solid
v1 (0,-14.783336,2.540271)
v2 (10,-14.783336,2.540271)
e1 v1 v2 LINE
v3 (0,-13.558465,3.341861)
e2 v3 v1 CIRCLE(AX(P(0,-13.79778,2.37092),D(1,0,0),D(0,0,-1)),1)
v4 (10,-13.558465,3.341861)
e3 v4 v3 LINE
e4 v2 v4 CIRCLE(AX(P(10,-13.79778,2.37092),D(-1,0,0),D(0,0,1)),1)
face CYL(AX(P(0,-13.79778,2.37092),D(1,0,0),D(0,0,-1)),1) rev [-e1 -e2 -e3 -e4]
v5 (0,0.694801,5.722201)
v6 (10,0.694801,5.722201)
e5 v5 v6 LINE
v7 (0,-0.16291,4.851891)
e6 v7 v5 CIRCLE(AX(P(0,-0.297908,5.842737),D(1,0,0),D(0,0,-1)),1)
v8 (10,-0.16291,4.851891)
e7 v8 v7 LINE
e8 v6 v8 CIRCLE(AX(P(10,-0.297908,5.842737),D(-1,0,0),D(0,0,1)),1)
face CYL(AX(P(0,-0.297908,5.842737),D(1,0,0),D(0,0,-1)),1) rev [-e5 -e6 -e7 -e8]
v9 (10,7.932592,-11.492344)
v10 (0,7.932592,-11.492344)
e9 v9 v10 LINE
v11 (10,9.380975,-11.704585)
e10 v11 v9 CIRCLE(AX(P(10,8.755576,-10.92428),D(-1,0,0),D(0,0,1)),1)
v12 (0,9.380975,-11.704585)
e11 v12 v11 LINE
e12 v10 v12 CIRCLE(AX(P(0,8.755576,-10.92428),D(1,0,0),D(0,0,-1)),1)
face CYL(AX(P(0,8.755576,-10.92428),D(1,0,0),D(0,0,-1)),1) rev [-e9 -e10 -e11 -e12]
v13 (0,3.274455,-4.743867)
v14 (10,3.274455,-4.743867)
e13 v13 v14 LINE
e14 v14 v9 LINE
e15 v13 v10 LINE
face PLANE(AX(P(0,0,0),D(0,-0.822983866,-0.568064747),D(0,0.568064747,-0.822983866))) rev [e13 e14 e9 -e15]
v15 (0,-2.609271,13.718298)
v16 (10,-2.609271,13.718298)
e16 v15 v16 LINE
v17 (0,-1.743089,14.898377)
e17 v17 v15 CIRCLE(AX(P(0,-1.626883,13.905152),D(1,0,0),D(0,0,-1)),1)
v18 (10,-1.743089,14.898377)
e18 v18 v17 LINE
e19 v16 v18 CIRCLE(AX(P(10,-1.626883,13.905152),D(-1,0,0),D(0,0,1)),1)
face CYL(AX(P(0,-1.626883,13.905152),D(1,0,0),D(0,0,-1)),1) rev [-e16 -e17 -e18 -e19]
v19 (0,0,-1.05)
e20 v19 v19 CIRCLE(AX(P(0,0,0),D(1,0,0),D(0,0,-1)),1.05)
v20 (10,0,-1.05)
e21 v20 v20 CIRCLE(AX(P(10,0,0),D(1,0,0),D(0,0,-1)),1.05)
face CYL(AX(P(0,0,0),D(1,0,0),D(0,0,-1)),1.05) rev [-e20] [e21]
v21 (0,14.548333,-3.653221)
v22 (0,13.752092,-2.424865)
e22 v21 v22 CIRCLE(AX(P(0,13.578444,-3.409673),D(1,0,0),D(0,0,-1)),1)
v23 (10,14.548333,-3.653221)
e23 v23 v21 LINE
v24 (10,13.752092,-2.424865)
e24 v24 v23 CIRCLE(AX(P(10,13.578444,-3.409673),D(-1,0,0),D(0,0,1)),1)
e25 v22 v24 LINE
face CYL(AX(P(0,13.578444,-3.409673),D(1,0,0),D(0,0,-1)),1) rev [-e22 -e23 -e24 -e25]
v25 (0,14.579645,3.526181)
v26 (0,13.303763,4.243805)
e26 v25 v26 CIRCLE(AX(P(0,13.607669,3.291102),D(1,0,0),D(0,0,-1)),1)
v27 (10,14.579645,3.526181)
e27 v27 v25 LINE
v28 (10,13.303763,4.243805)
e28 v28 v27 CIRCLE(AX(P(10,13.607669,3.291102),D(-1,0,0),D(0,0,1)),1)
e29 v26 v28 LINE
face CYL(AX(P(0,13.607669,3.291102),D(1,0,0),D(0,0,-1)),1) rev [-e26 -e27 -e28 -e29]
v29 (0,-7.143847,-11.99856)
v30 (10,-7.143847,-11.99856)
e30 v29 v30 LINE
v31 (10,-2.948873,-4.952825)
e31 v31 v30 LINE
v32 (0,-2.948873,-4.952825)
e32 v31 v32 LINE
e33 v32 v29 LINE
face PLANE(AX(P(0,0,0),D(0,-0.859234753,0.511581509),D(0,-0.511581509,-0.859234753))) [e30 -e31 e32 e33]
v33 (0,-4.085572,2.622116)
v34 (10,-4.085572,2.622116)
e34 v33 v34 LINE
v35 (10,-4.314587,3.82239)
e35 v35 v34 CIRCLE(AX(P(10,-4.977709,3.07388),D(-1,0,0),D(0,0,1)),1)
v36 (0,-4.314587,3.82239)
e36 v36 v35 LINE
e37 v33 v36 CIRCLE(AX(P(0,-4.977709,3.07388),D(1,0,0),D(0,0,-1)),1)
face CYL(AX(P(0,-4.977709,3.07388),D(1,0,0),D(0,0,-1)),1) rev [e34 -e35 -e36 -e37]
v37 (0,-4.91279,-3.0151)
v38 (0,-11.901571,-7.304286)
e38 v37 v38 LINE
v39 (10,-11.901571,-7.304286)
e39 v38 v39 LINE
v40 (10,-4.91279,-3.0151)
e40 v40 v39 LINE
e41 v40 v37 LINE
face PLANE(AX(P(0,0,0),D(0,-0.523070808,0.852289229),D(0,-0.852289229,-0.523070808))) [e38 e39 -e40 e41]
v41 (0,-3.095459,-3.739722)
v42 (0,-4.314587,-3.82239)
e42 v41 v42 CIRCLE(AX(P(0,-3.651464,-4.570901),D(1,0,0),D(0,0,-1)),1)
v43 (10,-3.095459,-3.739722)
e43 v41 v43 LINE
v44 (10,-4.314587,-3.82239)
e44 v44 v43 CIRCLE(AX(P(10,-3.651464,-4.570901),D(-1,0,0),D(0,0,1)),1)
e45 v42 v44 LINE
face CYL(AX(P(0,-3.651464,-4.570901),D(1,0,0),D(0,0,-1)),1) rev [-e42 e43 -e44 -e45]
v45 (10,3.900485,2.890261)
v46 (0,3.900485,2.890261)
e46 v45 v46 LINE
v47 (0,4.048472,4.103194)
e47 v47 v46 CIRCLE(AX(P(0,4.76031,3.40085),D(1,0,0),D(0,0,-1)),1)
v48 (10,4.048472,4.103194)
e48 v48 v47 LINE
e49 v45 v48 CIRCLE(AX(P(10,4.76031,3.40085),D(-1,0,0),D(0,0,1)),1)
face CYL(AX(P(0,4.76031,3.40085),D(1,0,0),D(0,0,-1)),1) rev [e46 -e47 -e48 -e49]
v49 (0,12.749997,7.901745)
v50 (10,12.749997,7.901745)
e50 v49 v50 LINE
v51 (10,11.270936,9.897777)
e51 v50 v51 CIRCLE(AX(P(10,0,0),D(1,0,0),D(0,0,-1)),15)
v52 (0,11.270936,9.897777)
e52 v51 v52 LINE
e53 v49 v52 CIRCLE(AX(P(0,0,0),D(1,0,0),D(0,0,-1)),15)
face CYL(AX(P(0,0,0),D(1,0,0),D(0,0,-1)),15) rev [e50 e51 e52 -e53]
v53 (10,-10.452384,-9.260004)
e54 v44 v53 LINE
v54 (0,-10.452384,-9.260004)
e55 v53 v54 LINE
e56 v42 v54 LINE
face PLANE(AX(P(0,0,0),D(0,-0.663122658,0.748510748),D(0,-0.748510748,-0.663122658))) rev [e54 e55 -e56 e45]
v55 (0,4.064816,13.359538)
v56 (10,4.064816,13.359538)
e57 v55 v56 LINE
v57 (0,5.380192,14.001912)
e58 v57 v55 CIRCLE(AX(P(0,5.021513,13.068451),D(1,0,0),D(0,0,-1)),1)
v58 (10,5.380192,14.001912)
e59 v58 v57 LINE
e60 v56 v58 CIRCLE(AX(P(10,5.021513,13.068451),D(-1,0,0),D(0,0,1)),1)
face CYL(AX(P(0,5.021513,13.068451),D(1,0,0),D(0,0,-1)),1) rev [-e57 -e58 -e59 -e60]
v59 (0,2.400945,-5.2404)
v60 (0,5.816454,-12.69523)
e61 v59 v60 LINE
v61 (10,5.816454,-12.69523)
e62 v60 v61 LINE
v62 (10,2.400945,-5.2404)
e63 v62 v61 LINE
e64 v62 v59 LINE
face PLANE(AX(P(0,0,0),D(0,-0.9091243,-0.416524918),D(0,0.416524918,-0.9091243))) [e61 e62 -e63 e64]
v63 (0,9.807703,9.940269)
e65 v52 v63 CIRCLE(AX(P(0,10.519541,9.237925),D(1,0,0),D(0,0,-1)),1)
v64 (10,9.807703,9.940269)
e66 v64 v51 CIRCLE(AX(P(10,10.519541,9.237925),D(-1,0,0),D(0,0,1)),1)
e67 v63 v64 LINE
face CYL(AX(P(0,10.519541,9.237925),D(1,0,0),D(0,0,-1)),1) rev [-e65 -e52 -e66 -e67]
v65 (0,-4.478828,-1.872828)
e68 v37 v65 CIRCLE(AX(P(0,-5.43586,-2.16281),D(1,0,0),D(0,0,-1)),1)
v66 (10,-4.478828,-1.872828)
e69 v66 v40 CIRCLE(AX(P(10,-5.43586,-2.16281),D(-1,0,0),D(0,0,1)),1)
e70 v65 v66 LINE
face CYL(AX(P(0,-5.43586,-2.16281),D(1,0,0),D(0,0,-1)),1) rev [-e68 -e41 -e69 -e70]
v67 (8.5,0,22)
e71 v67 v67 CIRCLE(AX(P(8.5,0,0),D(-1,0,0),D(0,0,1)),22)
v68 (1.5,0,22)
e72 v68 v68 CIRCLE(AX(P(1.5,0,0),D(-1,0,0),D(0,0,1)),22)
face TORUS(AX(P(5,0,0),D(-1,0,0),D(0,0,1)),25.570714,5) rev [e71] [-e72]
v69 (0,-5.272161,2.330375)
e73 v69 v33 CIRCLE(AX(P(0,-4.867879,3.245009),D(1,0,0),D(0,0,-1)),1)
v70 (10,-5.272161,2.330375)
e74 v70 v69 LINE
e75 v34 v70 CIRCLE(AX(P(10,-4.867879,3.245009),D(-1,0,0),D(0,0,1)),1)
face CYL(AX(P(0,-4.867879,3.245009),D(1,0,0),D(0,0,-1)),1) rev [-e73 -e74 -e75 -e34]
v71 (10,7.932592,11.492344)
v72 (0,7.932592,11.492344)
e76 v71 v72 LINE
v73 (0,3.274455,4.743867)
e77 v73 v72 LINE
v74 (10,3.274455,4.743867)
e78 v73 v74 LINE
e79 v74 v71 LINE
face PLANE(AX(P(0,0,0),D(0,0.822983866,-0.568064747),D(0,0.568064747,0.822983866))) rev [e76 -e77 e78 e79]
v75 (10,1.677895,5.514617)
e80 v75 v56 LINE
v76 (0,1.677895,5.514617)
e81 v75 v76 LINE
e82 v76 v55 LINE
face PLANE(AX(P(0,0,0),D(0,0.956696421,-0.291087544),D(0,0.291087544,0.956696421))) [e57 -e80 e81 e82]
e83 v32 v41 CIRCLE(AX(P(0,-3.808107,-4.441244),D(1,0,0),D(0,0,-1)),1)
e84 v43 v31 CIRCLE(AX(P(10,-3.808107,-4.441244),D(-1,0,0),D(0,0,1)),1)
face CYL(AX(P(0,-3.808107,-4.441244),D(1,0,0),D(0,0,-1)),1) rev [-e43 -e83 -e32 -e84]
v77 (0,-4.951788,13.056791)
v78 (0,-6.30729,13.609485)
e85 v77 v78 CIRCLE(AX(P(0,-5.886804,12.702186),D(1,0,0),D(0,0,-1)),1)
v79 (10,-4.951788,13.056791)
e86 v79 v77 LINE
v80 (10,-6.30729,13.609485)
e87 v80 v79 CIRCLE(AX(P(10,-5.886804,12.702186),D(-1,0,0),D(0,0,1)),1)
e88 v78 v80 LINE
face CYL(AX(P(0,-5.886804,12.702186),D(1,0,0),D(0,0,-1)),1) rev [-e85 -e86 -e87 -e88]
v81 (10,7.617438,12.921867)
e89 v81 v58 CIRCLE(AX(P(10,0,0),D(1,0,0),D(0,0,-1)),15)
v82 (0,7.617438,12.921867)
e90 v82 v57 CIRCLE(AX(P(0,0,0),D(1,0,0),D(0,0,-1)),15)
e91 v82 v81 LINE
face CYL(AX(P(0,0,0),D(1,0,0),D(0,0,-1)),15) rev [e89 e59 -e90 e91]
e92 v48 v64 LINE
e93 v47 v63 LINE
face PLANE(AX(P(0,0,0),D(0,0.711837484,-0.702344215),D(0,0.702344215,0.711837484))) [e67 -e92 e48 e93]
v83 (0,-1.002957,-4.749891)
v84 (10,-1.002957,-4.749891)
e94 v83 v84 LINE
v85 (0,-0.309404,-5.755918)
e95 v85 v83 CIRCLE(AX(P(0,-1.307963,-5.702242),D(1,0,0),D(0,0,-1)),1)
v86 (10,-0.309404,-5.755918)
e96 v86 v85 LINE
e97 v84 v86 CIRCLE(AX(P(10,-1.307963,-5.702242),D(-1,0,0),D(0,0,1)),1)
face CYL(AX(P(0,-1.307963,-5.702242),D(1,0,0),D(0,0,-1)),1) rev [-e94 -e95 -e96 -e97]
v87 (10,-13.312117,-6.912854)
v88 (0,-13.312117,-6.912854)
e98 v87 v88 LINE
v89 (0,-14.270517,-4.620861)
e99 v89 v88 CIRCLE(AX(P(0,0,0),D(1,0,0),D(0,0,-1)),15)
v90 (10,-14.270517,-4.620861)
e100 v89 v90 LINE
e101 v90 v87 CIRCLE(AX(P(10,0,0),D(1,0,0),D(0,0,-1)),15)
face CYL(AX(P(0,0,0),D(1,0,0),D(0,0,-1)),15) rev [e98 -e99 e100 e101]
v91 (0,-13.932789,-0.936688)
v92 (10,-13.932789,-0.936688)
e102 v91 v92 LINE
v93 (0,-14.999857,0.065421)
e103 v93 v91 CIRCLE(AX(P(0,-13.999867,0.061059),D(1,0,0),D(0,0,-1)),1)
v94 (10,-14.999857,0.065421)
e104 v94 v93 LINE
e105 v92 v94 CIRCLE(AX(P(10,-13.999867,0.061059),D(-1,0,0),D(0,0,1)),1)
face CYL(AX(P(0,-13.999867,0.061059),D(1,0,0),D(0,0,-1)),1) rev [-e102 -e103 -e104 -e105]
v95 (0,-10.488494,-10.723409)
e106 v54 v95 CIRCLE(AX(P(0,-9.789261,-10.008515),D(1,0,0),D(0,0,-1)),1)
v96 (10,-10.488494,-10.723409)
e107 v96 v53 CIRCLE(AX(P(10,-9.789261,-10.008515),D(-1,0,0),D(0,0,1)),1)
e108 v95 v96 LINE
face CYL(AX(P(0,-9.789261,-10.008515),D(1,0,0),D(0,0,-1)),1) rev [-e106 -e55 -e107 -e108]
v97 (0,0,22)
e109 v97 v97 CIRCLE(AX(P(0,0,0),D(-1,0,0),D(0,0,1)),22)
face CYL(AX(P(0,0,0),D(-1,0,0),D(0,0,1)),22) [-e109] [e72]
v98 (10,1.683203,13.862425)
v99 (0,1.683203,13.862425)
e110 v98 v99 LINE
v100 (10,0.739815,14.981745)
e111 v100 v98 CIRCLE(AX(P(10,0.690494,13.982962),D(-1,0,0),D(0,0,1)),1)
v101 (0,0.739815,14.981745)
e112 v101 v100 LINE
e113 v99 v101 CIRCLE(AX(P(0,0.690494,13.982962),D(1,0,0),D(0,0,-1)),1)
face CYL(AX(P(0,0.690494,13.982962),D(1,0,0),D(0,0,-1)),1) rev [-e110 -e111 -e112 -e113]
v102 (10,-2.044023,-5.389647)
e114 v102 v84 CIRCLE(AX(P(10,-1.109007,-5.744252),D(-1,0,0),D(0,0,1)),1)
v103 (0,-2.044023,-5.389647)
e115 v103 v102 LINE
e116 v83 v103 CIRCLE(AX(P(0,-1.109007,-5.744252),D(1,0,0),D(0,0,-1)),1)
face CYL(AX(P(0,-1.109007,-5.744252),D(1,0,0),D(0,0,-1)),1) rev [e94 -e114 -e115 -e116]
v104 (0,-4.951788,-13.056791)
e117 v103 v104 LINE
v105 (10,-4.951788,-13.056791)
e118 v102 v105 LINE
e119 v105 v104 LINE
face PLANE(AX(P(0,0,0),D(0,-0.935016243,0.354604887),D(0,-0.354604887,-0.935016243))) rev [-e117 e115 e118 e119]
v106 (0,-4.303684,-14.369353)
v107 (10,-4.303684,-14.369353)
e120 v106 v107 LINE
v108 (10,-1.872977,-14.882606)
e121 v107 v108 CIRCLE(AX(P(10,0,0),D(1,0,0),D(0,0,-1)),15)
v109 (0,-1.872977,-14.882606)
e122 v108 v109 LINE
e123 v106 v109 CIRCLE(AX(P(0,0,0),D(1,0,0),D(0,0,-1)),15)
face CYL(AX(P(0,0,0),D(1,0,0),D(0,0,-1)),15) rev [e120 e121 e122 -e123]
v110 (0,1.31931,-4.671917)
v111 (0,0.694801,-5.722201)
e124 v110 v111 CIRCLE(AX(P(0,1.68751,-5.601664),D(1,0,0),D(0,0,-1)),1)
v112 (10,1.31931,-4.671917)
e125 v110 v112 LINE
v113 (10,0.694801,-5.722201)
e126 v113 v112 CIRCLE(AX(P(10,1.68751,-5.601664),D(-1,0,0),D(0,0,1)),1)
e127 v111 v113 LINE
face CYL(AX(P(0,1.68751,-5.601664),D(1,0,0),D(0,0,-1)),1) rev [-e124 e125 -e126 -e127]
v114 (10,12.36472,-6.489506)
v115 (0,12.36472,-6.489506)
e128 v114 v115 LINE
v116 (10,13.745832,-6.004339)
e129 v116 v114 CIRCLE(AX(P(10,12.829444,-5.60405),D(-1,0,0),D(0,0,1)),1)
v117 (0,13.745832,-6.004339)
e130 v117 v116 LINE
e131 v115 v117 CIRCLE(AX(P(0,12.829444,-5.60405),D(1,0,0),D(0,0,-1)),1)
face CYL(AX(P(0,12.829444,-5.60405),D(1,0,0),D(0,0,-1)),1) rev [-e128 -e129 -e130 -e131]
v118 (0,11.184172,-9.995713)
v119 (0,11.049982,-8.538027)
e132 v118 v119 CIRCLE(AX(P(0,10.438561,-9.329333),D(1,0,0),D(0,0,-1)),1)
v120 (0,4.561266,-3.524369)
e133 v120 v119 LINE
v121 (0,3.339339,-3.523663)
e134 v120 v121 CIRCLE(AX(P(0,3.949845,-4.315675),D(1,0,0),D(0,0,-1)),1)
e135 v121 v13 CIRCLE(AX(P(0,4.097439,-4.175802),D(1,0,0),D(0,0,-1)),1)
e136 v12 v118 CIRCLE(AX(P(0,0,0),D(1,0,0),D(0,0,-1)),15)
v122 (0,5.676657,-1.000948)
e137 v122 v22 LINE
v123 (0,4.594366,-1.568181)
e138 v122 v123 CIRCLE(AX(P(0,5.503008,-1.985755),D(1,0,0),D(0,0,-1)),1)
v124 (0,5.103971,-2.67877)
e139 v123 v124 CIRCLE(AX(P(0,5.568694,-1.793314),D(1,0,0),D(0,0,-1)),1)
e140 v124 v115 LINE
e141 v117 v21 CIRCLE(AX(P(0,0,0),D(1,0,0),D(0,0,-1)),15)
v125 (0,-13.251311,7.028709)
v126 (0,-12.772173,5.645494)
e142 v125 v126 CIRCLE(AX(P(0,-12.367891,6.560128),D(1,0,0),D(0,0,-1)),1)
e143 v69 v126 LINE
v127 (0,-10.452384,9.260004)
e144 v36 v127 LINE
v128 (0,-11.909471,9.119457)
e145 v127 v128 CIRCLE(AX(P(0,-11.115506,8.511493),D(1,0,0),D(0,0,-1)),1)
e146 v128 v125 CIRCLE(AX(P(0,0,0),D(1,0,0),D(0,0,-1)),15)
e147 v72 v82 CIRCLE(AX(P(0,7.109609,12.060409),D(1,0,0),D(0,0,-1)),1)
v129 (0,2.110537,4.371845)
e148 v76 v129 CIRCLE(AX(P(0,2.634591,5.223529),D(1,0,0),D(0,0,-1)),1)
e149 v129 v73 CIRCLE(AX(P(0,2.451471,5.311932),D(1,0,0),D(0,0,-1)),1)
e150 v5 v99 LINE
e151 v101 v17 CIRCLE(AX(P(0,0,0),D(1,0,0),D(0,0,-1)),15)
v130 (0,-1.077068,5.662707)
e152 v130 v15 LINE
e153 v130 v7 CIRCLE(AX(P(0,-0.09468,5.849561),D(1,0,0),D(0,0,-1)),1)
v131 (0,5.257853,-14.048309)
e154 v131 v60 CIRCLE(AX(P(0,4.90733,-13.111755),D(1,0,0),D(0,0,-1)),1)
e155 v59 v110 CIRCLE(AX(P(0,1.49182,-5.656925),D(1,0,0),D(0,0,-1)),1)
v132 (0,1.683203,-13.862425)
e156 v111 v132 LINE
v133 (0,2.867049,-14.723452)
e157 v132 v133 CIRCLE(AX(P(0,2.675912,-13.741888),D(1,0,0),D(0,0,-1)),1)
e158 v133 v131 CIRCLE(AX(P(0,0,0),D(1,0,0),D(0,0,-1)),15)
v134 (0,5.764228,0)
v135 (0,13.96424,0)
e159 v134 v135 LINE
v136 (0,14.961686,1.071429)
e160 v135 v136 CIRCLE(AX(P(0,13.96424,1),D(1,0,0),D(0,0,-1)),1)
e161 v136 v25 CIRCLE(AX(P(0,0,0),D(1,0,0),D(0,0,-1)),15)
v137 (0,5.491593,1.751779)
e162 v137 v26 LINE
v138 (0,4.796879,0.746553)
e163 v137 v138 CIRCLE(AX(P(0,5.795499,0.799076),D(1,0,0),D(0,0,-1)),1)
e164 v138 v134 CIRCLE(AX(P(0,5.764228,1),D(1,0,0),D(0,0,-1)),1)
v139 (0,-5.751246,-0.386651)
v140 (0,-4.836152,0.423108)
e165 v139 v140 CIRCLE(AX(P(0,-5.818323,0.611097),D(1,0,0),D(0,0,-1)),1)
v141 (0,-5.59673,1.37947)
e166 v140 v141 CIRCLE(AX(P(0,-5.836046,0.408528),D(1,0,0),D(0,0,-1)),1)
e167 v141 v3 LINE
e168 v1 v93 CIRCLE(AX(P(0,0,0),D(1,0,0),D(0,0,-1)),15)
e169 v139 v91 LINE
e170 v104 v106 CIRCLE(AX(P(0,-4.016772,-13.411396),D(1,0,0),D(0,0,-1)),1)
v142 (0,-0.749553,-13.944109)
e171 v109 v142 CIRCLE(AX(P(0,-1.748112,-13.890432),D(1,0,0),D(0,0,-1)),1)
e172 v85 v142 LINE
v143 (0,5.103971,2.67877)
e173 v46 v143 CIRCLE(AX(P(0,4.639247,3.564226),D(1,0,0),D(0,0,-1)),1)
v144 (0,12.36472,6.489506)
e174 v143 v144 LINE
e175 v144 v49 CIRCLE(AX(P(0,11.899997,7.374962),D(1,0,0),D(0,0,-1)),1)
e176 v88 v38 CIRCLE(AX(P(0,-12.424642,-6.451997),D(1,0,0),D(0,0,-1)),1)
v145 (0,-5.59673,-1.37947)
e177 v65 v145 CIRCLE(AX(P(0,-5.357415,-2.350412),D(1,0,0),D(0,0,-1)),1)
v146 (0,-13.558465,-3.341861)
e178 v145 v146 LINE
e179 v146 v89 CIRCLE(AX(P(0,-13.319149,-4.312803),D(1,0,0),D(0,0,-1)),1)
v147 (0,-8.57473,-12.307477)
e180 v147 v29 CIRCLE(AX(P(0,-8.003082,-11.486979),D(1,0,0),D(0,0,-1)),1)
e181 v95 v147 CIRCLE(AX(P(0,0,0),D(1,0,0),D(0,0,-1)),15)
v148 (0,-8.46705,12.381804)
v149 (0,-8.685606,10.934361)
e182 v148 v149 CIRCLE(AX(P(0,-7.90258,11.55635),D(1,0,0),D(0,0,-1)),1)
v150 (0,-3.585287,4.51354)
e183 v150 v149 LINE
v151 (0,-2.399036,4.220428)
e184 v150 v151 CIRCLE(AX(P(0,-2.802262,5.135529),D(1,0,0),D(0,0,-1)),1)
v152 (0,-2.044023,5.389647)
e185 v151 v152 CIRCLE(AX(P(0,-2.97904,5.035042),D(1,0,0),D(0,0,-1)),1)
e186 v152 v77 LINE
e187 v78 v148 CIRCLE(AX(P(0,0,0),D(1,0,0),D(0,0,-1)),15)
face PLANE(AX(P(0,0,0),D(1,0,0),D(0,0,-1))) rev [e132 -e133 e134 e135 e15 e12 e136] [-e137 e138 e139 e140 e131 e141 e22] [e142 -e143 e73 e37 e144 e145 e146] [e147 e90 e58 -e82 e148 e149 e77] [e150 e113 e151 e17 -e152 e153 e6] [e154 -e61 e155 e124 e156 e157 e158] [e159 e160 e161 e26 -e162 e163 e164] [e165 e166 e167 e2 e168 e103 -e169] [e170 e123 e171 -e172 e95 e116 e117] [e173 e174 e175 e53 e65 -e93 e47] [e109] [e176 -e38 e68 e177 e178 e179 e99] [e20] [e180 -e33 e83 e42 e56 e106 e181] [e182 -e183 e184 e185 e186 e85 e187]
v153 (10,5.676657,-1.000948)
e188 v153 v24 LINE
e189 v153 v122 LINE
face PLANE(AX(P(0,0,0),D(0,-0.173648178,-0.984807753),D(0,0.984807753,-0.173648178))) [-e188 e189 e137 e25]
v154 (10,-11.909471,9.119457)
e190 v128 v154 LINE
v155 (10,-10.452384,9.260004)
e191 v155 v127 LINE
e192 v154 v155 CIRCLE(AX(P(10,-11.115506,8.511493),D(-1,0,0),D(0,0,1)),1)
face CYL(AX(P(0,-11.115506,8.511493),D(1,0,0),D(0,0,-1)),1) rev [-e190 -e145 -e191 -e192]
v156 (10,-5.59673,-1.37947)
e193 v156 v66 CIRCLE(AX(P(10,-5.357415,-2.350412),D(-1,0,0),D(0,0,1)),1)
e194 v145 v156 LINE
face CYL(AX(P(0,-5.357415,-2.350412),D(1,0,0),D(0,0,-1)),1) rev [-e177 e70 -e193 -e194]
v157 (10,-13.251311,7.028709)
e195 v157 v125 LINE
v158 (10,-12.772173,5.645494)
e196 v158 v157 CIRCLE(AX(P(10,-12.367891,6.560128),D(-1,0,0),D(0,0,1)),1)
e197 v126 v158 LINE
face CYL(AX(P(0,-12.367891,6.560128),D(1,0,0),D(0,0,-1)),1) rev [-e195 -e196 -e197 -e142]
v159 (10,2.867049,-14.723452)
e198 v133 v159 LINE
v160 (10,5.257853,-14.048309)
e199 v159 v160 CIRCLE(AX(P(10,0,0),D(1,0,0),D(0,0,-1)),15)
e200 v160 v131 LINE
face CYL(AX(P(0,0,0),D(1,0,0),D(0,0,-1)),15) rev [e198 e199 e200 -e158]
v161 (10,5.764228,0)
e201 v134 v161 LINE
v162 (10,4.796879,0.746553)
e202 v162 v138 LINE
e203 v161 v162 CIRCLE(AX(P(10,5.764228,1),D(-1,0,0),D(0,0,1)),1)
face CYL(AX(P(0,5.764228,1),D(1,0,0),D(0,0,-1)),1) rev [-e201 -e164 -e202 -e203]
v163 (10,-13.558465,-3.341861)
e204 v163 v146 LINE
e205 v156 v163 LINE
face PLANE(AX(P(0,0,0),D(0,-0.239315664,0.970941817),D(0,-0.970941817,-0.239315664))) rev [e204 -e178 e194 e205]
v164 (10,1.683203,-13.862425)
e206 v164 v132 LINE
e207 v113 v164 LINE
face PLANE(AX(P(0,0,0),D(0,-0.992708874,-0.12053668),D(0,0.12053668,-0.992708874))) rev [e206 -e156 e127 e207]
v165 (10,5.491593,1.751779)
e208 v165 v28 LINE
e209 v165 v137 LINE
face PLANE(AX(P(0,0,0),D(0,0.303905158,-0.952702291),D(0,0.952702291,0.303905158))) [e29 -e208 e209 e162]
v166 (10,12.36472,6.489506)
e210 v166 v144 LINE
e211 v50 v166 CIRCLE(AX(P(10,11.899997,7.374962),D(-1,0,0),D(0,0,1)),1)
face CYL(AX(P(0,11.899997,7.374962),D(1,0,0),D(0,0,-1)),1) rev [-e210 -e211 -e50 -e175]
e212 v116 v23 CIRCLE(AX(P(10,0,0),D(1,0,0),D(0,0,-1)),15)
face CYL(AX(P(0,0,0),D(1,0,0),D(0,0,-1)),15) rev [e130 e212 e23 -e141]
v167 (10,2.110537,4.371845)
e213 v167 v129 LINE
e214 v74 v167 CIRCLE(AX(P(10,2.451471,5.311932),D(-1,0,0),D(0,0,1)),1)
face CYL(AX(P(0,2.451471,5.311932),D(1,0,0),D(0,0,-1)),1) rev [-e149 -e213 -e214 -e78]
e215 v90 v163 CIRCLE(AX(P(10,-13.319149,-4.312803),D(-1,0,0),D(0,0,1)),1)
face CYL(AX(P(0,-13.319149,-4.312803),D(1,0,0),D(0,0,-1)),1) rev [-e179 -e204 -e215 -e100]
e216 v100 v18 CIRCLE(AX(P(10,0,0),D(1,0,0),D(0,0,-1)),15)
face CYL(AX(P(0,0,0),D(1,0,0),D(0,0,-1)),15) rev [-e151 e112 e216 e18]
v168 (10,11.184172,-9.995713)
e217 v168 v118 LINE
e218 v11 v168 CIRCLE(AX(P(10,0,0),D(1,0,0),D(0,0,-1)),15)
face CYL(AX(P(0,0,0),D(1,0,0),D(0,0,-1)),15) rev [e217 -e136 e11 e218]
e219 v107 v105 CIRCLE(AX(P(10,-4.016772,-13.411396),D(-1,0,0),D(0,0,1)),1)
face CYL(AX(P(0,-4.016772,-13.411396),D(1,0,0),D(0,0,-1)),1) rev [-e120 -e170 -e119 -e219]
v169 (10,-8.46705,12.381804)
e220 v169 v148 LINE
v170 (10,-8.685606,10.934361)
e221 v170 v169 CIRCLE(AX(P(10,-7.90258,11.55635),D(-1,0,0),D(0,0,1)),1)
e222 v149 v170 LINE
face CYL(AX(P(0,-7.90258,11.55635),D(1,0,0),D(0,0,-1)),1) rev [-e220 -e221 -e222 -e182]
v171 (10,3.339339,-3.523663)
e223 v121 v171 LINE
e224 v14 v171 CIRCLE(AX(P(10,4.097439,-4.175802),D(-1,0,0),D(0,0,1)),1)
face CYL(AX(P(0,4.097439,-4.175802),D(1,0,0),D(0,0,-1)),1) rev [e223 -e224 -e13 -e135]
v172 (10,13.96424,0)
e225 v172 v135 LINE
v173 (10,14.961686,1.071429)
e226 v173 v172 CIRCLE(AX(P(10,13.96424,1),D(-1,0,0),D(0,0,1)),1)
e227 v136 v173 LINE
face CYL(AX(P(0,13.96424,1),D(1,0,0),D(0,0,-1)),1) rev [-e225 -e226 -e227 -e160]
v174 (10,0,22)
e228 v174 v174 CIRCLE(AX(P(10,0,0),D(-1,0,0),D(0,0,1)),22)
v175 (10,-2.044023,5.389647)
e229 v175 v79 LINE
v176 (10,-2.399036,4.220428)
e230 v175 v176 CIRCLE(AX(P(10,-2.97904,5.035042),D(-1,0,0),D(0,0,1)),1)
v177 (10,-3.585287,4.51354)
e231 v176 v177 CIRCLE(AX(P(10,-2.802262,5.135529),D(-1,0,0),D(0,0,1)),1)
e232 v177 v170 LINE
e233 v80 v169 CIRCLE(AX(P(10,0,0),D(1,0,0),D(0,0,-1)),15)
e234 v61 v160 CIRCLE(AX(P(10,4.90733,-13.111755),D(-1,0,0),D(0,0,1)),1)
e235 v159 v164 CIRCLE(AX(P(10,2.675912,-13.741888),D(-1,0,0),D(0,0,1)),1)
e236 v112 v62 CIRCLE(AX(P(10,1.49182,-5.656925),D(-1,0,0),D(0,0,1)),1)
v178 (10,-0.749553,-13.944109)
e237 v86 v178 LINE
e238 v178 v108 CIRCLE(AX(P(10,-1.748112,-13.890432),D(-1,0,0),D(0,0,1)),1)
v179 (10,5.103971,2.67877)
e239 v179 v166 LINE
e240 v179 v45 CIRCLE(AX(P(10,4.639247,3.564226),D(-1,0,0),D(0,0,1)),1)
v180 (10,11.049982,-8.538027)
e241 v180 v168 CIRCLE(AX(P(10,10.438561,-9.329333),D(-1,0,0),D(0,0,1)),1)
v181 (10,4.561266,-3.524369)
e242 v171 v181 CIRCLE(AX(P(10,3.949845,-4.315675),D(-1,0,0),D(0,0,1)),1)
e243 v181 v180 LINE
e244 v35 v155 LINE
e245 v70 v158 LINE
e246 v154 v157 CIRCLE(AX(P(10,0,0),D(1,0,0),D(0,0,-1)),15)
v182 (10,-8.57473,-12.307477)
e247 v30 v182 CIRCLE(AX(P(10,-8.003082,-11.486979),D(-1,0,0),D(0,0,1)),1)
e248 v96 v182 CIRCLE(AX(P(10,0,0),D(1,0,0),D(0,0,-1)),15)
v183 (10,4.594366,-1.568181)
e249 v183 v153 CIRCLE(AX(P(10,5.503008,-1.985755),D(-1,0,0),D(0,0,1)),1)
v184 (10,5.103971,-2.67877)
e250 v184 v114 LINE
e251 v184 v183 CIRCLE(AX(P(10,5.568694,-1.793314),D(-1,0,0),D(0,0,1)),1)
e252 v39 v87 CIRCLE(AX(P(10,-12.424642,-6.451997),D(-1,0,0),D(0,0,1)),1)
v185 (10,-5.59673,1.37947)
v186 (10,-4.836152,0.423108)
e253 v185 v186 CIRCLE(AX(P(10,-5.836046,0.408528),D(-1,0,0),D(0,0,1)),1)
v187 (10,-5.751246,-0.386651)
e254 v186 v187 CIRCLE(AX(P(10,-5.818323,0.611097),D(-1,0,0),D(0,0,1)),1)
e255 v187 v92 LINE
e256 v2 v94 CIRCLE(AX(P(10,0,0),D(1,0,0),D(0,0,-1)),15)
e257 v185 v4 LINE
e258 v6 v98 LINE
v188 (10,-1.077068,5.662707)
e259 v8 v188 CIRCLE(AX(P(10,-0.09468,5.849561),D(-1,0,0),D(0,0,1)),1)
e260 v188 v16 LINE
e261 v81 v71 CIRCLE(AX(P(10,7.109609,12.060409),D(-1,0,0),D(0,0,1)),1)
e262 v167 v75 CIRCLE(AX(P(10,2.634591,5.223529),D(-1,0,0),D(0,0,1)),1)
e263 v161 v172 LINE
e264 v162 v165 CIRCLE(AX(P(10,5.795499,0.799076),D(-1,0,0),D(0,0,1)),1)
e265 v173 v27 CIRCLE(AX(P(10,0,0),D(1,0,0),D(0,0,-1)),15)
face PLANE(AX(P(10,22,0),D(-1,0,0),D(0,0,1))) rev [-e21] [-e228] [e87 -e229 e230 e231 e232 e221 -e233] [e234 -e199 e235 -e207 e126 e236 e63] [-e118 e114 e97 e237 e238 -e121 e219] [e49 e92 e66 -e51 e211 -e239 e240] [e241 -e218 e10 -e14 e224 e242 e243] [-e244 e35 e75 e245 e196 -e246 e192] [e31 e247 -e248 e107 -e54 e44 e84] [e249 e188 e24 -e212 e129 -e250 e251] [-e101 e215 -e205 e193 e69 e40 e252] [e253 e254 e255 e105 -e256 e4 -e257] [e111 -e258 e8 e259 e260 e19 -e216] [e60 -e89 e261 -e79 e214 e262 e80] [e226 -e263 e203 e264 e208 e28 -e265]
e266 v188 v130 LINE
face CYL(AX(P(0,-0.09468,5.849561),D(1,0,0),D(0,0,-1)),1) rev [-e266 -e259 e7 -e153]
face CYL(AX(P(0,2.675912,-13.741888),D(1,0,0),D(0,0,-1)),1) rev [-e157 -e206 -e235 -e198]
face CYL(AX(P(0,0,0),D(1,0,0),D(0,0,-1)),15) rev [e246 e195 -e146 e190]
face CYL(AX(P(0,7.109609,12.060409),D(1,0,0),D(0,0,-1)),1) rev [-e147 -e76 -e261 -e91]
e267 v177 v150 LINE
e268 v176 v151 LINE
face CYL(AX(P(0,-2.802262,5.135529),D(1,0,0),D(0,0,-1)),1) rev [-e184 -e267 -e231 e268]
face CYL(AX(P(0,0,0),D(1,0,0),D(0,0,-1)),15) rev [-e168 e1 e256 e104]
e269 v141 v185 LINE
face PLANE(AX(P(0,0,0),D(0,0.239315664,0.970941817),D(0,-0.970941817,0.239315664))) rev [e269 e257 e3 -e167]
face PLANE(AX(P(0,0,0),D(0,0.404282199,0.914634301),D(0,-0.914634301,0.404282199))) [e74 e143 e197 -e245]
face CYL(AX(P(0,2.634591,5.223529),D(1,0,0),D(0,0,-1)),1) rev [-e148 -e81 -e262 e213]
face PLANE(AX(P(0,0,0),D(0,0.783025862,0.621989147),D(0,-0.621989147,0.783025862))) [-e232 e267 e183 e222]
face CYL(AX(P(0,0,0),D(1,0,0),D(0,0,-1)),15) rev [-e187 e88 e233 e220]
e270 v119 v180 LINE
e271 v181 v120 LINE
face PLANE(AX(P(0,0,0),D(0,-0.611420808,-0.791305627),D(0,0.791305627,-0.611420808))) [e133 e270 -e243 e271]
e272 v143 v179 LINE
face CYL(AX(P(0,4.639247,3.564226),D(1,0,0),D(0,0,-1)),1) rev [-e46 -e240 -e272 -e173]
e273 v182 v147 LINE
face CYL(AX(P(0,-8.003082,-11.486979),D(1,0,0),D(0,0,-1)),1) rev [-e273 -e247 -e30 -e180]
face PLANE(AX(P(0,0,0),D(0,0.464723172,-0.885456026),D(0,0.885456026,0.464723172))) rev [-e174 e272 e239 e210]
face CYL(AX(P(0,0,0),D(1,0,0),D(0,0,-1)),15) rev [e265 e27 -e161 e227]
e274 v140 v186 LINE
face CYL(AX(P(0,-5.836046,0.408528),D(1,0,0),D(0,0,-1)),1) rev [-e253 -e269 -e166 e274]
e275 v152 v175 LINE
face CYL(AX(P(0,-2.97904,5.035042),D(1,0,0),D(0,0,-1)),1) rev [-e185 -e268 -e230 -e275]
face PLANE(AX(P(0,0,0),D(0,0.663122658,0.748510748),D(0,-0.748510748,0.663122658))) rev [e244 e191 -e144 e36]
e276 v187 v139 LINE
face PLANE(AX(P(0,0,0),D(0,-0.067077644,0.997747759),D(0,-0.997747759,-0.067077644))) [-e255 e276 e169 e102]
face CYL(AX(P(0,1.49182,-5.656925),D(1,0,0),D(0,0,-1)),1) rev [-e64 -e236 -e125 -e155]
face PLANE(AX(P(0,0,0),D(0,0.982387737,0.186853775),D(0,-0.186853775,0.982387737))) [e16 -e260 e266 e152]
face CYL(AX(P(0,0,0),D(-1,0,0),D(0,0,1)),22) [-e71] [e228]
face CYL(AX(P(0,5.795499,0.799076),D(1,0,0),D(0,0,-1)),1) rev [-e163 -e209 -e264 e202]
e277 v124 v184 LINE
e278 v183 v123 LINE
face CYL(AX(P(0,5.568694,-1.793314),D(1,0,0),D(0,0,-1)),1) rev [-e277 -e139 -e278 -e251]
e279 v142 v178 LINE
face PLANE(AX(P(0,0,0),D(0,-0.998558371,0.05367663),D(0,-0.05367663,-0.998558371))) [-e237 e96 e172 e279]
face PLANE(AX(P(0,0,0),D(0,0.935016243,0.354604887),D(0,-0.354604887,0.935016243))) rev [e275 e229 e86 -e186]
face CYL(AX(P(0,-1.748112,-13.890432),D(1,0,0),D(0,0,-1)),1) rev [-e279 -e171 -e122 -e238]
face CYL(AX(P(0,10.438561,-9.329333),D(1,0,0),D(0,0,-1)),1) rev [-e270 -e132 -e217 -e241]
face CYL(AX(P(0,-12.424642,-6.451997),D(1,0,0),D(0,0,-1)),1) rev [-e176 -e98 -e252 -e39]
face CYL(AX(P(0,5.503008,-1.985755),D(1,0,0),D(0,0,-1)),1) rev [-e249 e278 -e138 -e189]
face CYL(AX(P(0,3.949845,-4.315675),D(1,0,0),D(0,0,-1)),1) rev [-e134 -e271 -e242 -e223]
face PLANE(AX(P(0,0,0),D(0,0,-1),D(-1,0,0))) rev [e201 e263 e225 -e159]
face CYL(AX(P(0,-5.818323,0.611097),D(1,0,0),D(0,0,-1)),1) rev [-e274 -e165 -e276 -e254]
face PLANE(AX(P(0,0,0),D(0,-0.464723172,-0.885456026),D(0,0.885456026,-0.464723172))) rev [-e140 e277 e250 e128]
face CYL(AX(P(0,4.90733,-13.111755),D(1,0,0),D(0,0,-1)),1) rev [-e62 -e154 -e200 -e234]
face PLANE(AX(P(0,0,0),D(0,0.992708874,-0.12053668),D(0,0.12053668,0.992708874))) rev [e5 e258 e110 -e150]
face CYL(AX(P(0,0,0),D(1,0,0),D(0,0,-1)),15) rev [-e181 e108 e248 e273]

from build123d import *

# Parameters (mm, degrees)
SKETCH2_R          = 1.05
CUT_EXTRUDE1_DEPTH = 10
CUT_EXTRUDE2_DEPTH = 33.680269277
FILLET1_R          = 1


with BuildPart() as part:
    # Sketch1 → Revolve2 (revolve)
    with BuildSketch(Plane.XY, mode=Mode.PRIVATE) as revolve2_sk:
        with BuildLine():
            Line((0, 0), (10, 0))
            Line((10, 0), (10, 22))
            Line((10, 22), (8.5, 22))
            ThreePointArc((8.5, 22), (5, 20.570714214), (1.5, 22))
            Line((1.5, 22), (0, 22))
            Line((0, 22), (0, 0))
        make_face()
    revolve(revolve2_sk.sketch.rotate(Axis((0, 0, 0), (1, 0, 0)), 90), axis=Axis((0, 0, 0), (1, 0, 0)))

    # Sketch2 → Cut-Extrude1 (cut)
    with BuildSketch(Plane(origin=(10, 0, 0), x_dir=(0, 0, -1), z_dir=(1, 0, 0))):
        Circle(SKETCH2_R)
    extrude(amount=-CUT_EXTRUDE1_DEPTH, mode=Mode.SUBTRACT)

    # Sketch3 → Cut-Extrude2 (cut, through all)
    with BuildSketch(Plane(origin=(10, 0, 0), x_dir=(0, 0, -1), z_dir=(1, 0, 0))):
        with BuildLine():
            Line((2.604722665, 14.772116295), (0.84225046, 4.776639722))
            ThreePointArc((0.84225046, 4.776639722), (1.566792192, 4.590297931), (2.25405939, 4.294751347))
            Line((2.25405939, 4.294751347), (6.970847581, 13.281840385))
            ThreePointArc((6.970847581, 13.281840385), (4.845422268, 14.195840343), (2.604722665, 14.772116295))
        make_face()
        with BuildLine():
            Line((9.171312121, 11.869584406), (2.965590908, 3.838091119))
            ThreePointArc((2.965590908, 3.838091119), (3.520543403, 3.336382325), (3.991740938, 2.755299829))
            Line((3.991740938, 2.755299829), (12.344757988, 8.520971201))
            ThreePointArc((12.344757988, 8.520971201), (10.887544298, 10.318012365), (9.171312121, 11.869584406))
        make_face()
        with BuildLine():
            Line((13.636864497, 6.247873773), (4.409550218, 2.020282094))
            ThreePointArc((4.409550218, 2.020282094), (4.667780547, 1.318141736), (4.814962743, 0.584642325))
            Line((4.814962743, 0.584642325), (14.890633111, 1.808050204))
            ThreePointArc((14.890633111, 1.808050204), (14.435461139, 4.076452099), (13.636864497, 6.247873773))
        make_face()
        with BuildLine():
            Line((14.978375558, -0.805149446), (4.843334715, -0.260349211))
            ThreePointArc((4.843334715, -0.260349211), (4.74568542, -1.002069239), (4.53513461, -1.719949689))
            Line((4.53513461, -1.719949689), (14.02524364, -5.319073306))
            ThreePointArc((14.02524364, -5.319073306), (14.676387798, -3.098974216), (14.978375558, -0.805149446))
        make_face()
        with BuildLine():
            Line((12.888521288, -7.67372263), (4.167569596, -2.48133765))
            ThreePointArc((4.167569596, -2.48133765), (3.736410956, -3.092718228), (3.216361792, -3.630521958))
            Line((3.216361792, -3.630521958), (9.946839874, -11.227661223))
            ThreePointArc((9.946839874, -11.227661223), (11.555130883, -9.564462885), (12.888521288, -7.67372263))
        make_face()
        with BuildLine():
            Line((7.846062115, -12.784338438), (2.537064508, -4.133881536))
            ThreePointArc((2.537064508, -4.133881536), (1.87116977, -4.474862742), (1.160759249, -4.709385399))
            Line((1.160759249, -4.709385399), (3.589734964, -14.564127261))
            ThreePointArc((3.589734964, -14.564127261), (5.786732737, -13.838848371), (7.846062115, -12.784338438))
        make_face()
        with BuildLine():
            ThreePointArc((0.325348516, -4.839402981), (-0.42273386, -4.83187013), (-1.160759249, -4.709385399))
            Line((-1.160759249, -4.709385399), (-3.589734964, -14.564127261))
            ThreePointArc((-3.589734964, -14.564127261), (-1.307336141, -14.942920471), (1.006164666, -14.966216378))
            Line((1.006164666, -14.966216378), (0.325348516, -4.839402981))
        make_face()
        with BuildLine():
            ThreePointArc((-1.9609009, -4.436275524), (-2.619794257, -4.081954301), (-3.216361792, -3.630521958))
            Line((-3.216361792, -3.630521958), (-9.946839874, -11.227661223))
            ThreePointArc((-9.946839874, -11.227661223), (-8.101910065, -12.623749574), (-6.064232982, -13.719514508))
            Line((-6.064232982, -13.719514508), (-1.9609009, -4.436275524))
        make_face()
        with BuildLine():
            ThreePointArc((-3.797931552, -3.016850808), (-4.216691362, -2.396911935), (-4.53513461, -1.719949689))
            Line((-4.53513461, -1.719949689), (-14.02524364, -5.319073306))
            ThreePointArc((-14.02524364, -5.319073306), (-13.040434031, -7.412629781), (-11.745387936, -9.329837203))
            Line((-11.745387936, -9.329837203), (-3.797931552, -3.016850808))
        make_face()
        with BuildLine():
            ThreePointArc((-4.764901855, -0.906301928), (-4.847595293, -0.162765931), (-4.814962743, 0.584642325))
            Line((-4.814962743, 0.584642325), (-14.890633111, 1.808050204))
            ThreePointArc((-14.890633111, 1.808050204), (-14.991551715, -0.503365838), (-14.735816061, -2.802806631))
            Line((-14.735816061, -2.802806631), (-4.764901855, -0.906301928))
        make_face()
        with BuildLine():
            ThreePointArc((-4.640290566, 1.411869801), (-4.367973561, 2.108667787), (-3.991740938, 2.755299829))
            Line((-3.991740938, 2.755299829), (-12.344757988, 8.520971201))
            ThreePointArc((-12.344757988, 8.520971201), (-13.508285569, 6.521213153), (-14.350446312, 4.366313163))
            Line((-14.350446312, 4.366313163), (-4.640290566, 1.411869801))
        make_face()
        with BuildLine():
            ThreePointArc((-3.45264463, 3.406599173), (-2.887701727, 3.897031127), (-2.25405939, 4.294751347))
            Line((-2.25405939, 4.294751347), (-6.970847581, 13.281840385))
            ThreePointArc((-6.970847581, 13.281840385), (-8.930433992, 12.051860799), (-10.677562255, 10.53516323))
            Line((-10.677562255, 10.53516323), (-3.45264463, 3.406599173))
        make_face()
        with BuildLine():
            ThreePointArc((-1.474039418, 4.620917729), (-0.745892228, 4.7926316), (0, 4.850327089))
            Line((0, 4.850327089), (0, 15))
            ThreePointArc((0, 15), (-2.30672761, 14.821572377), (-4.558577364, 14.290534364))
            Line((-4.558577364, 14.290534364), (-1.474039418, 4.620917729))
        make_face()
    extrude(amount=-CUT_EXTRUDE2_DEPTH, mode=Mode.SUBTRACT)

    # Fillet1
    # the kernel refuses this fillet: 1 mm, written as the material it adds along each edge
    with BuildSketch(Plane(origin=(10, 14.290534364, 4.558577364), x_dir=(0, 0.26966420058726454, -0.9629544220375291), z_dir=(-1, 0, 0)), Plane(origin=(10, 10.53516323, 10.677562255), x_dir=(0, 0.6862830248559348, -0.7273345927388495), z_dir=(-1, 0, 0)), Plane(origin=(10, 4.366313163, 14.350446312), x_dir=(0, 0.9456826787369845, -0.3250911735757235), z_dir=(-1, 0, 0))) as fillet1_piece_1:
        with BuildLine():
            CenterArc((1.036376297, 0.999361225), FILLET1_R, 177.951978121, 94.096043758)
            Line((0.037015071, 1.035098339), (0, 0))
            ThreePointArc((0, 0), (0.536056705, -0.00958162), (1.07211341, 0))
        make_face()
    extrude(amount=10)
    with BuildSketch(Plane(origin=(10, 14.772116295, -2.604722665), x_dir=(0, -0.9848077530122082, 0.17364817766692997), z_dir=(-1, 0, 0)), Plane(origin=(10, 11.869584406, -9.171312121), x_dir=(0, -0.7913056270696629, 0.6114208080920107), z_dir=(-1, 0, 0)), Plane(origin=(10, -0.805149446, -14.978375558), x_dir=(0, 0.05367662970312148, 0.9985583705641419), z_dir=(-1, 0, 0)), Plane(origin=(10, 6.247873773, -13.636864497), x_dir=(0, -0.4165249182320387, 0.9091242998027241), z_dir=(-1, 0, 0)), Plane(origin=(10, -2.802806631, 14.735816061), x_dir=(0, 0.18685377538420386, -0.9823877374156649), z_dir=(-1, 0, 0)), Plane(origin=(10, -9.329837203, 11.745387936), x_dir=(0, 0.6219891468387043, -0.7830258624176221), z_dir=(-1, 0, 0)), Plane(origin=(10, -13.719514508, 6.064232982), x_dir=(0, 0.9146343005342535, -0.40428219882430744), z_dir=(-1, 0, 0)), Plane(origin=(10, -14.966216378, -1.006164666), x_dir=(0, 0.9977477585156255, 0.06707764439099849), z_dir=(-1, 0, 0)), Plane(origin=(10, -12.784338438, -7.846062115), x_dir=(0, 0.8522892291850337, 0.523070807649577), z_dir=(-1, 0, 0)), Plane(origin=(10, -7.67372263, -12.888521288), x_dir=(0, 0.5115815086468098, 0.859234752562217), z_dir=(-1, 0, 0))) as fillet1_piece_2:
        with BuildLine():
            CenterArc((1.035759956, -1), FILLET1_R, 90, 94.096043758)
            ThreePointArc((0.038314239, -1.071428571), (0.00958162, -0.536056705), (0, 0))
            Line((0, 0), (1.035759956, 0))
        make_face()
    extrude(amount=10)
    with BuildSketch(Plane(origin=(10, 1.808050204, 14.890633111), x_dir=(0, -0.9963823898655443, 0.08498313459638004), z_dir=(-1, 0, 0)), Plane(origin=(10, -5.319073306, 14.02524364), x_dir=(0, -0.9217464228410107, -0.38779315617968374), z_dir=(-1, 0, 0)), Plane(origin=(10, -14.564127261, 3.589734964), x_dir=(0, -0.20446413740132124, -0.9788740554927041), z_dir=(-1, 0, 0)), Plane(origin=(10, 1.808050204, -14.890633111), x_dir=(0, 0.9877671237764138, 0.15593623436030185), z_dir=(-1, 0, 0)), Plane(origin=(10, 8.520971201, -12.344757988), x_dir=(0, 0.8021571702215626, 0.5971129493338215), z_dir=(-1, 0, 0)), Plane(origin=(10, 15, 0), x_dir=(0, -0.03573711367703827, 0.9993612253364819), z_dir=(-1, 0, 0)), Plane(origin=(10, 13.281840385, 6.970847581), x_dir=(0, -0.49606996130055675, 0.8682825539507656), z_dir=(-1, 0, 0)), Plane(origin=(10, 8.520971201, 12.344757988), x_dir=(0, -0.8427591590813438, 0.5382908133941227), z_dir=(-1, 0, 0)), Plane(origin=(10, -11.227661223, -9.946839874), x_dir=(0, 0.6894486859841403, -0.7243345286500862), z_dir=(-1, 0, 0))) as fillet1_piece_3:
        with BuildLine():
            CenterArc((1.036376297, -0.999361225), FILLET1_R, 87.951978121, 94.096043758)
            Line((0.037015071, -1.035098339), (0, 0))
            ThreePointArc((0, 0), (0.536056705, 0.00958162), (1.07211341, 0))
        make_face()
    extrude(amount=10)
    with BuildSketch(Plane(origin=(10, -11.227661223, 9.946839874), x_dir=(0, 0.7485107481710997, -0.6631226582407966), z_dir=(-1, 0, 0)), Plane(origin=(10, -14.564127261, -3.589734964), x_dir=(0, 0.9709418174260528, 0.23931566428755488), z_dir=(-1, 0, 0)), Plane(origin=(10, -5.319073306, -14.02524364), x_dir=(0, 0.35460488704253845, 0.9350162426854137), z_dir=(-1, 0, 0)), Plane(origin=(10, 13.281840385, -6.970847581), x_dir=(0, -0.8854560256532109, 0.4647231720437667), z_dir=(-1, 0, 0))) as fillet1_piece_4:
        with BuildLine():
            CenterArc((1.035759956, 1), FILLET1_R, 175.903956242, 94.096043758)
            ThreePointArc((0.038314239, 1.071428571), (0.00958162, 0.536056705), (0, 0))
            Line((0, 0), (1.035759956, 0))
        make_face()
    extrude(amount=10)
    with BuildSketch(Plane(origin=(10, 4.620917729, 1.474039418), x_dir=(0, 0.22106072386394496, -0.9752600455082473), z_dir=(-1, 0, 0)), Plane(origin=(10, 3.406599173, 3.45264463), x_dir=(0, 0.6489654918969179, -0.7608178430655997), z_dir=(-1, 0, 0)), Plane(origin=(10, 1.411869801, 4.640290566), x_dir=(0, 0.9282000866181308, -0.3720814416254783), z_dir=(-1, 0, 0)), Plane(origin=(10, -3.016850808, 3.797931552), x_dir=(0, 0.8334947703768036, 0.5525273457074493), z_dir=(-1, 0, 0)), Plane(origin=(10, -4.436275524, 1.9609009), x_dir=(0, 0.4812507060426553, 0.8765830011661448), z_dir=(-1, 0, 0)), Plane(origin=(10, -4.133881536, -2.537064508), x_dir=(0, -0.44803210663360266, 0.8940174670695512), z_dir=(-1, 0, 0)), Plane(origin=(10, -2.48133765, -4.167569596), x_dir=(0, -0.8121833616638006, 0.5834022514839039), z_dir=(-1, 0, 0)), Plane(origin=(10, -0.260349211, -4.843334715), x_dir=(0, -0.990273196407553, 0.13913661084260984), z_dir=(-1, 0, 0)), Plane(origin=(10, 2.020282094, -4.409550218), x_dir=(0, -0.9415033759401247, -0.3370035505648989), z_dir=(-1, 0, 0)), Plane(origin=(10, 4.776639722, -0.84225046), x_dir=(0, -0.2574863919358113, -0.9662819246823765), z_dir=(-1, 0, 0)), Plane(origin=(10, 3.838091119, -2.965590908), x_dir=(0, -0.677046478390387, -0.7359402598711225), z_dir=(-1, 0, 0))) as fillet1_piece_5:
        with BuildLine():
            CenterArc((0.917918164, -0.996313974), FILLET1_R, 94.920965652, 80.158068696)
            Line((-0.07839581, -0.910532474), (0, 0))
            ThreePointArc((0, 0), (0.416068332, -0.017878433), (0.832136664, 0))
        make_face()
    extrude(amount=10)
    with BuildSketch(Plane(origin=(10, 4.850327089, 0), x_dir=(0, 1, 0), z_dir=(-1, 0, 0)), Plane(origin=(10, 4.294751347, 2.25405939), x_dir=(0, 0.8854560256532094, 0.46472317204376956), z_dir=(-1, 0, 0)), Plane(origin=(10, 2.755299829, 3.991740938), x_dir=(0, 0.5680647467311564, 0.822983865893656), z_dir=(-1, 0, 0)), Plane(origin=(10, 0.584642325, 4.814962743), x_dir=(0, 0.12053668025532241, 0.9927088740980541), z_dir=(-1, 0, 0)), Plane(origin=(10, -3.630521958, 3.216361792), x_dir=(0, -0.7485107481711016, 0.6631226582407946), z_dir=(-1, 0, 0)), Plane(origin=(10, -4.709385399, 1.160759249), x_dir=(0, -0.9709418174260522, 0.23931566428755724), z_dir=(-1, 0, 0)), Plane(origin=(10, -4.709385399, -1.160759249), x_dir=(0, -0.9709418174260516, -0.23931566428755952), z_dir=(-1, 0, 0)), Plane(origin=(10, -1.719949689, -4.53513461), x_dir=(0, -0.354604887042536, -0.9350162426854146), z_dir=(-1, 0, 0)), Plane(origin=(10, 4.294751347, -2.25405939), x_dir=(0, 0.8854560256532098, -0.4647231720437688), z_dir=(-1, 0, 0))) as fillet1_piece_6:
        with BuildLine():
            CenterArc((0.913901138, -1), FILLET1_R, 90, 80.158068696)
            ThreePointArc((-0.071381931, -0.829069386), (-0.017878433, -0.416068332), (0, 0))
            Line((0, 0), (0.913901138, 0))
        make_face()
    extrude(amount=10)
    with BuildSketch(Plane(origin=(10, -0.906301928, 4.764901855), x_dir=(0, -0.18685377538420458, 0.9823877374156648), z_dir=(-1, 0, 0)), Plane(origin=(10, -4.839402981, -0.325348516), x_dir=(0, -0.9977477585156251, -0.0670776443910017), z_dir=(-1, 0, 0))) as fillet1_piece_7:
        with BuildLine():
            CenterArc((0.913901138, 1), FILLET1_R, 189.841931304, 80.158068696)
            ThreePointArc((-0.071381931, 0.829069386), (-0.017878433, 0.416068332), (0, 0))
            Line((0, 0), (0.913901138, 0))
        make_face()
    extrude(amount=10)
    with BuildSketch(Plane(origin=(10, -1.719949689, 4.53513461), x_dir=(0, -0.9011512092511582, -0.4335048997014627), z_dir=(-1, 0, 0)), Plane(origin=(10, -3.630521958, -3.216361792), x_dir=(0, 0.7248867452699457, -0.6888680617737659), z_dir=(-1, 0, 0)), Plane(origin=(10, 0.584642325, -4.814962743), x_dir=(0, 0.9787099059298004, 0.2052484349145714), z_dir=(-1, 0, 0)), Plane(origin=(10, 2.755299829, -3.991740938), x_dir=(0, 0.7712208798416369, 0.6365676354451987), z_dir=(-1, 0, 0))) as fillet1_piece_8:
        with BuildLine():
            CenterArc((0.917918164, 0.996313974), FILLET1_R, 184.920965652, 80.158068696)
            Line((-0.07839581, 0.910532474), (0, 0))
            ThreePointArc((0, 0), (0.416068332, 0.017878433), (0.832136664, 0))
        make_face()
    extrude(amount=10)


solid = part.part
